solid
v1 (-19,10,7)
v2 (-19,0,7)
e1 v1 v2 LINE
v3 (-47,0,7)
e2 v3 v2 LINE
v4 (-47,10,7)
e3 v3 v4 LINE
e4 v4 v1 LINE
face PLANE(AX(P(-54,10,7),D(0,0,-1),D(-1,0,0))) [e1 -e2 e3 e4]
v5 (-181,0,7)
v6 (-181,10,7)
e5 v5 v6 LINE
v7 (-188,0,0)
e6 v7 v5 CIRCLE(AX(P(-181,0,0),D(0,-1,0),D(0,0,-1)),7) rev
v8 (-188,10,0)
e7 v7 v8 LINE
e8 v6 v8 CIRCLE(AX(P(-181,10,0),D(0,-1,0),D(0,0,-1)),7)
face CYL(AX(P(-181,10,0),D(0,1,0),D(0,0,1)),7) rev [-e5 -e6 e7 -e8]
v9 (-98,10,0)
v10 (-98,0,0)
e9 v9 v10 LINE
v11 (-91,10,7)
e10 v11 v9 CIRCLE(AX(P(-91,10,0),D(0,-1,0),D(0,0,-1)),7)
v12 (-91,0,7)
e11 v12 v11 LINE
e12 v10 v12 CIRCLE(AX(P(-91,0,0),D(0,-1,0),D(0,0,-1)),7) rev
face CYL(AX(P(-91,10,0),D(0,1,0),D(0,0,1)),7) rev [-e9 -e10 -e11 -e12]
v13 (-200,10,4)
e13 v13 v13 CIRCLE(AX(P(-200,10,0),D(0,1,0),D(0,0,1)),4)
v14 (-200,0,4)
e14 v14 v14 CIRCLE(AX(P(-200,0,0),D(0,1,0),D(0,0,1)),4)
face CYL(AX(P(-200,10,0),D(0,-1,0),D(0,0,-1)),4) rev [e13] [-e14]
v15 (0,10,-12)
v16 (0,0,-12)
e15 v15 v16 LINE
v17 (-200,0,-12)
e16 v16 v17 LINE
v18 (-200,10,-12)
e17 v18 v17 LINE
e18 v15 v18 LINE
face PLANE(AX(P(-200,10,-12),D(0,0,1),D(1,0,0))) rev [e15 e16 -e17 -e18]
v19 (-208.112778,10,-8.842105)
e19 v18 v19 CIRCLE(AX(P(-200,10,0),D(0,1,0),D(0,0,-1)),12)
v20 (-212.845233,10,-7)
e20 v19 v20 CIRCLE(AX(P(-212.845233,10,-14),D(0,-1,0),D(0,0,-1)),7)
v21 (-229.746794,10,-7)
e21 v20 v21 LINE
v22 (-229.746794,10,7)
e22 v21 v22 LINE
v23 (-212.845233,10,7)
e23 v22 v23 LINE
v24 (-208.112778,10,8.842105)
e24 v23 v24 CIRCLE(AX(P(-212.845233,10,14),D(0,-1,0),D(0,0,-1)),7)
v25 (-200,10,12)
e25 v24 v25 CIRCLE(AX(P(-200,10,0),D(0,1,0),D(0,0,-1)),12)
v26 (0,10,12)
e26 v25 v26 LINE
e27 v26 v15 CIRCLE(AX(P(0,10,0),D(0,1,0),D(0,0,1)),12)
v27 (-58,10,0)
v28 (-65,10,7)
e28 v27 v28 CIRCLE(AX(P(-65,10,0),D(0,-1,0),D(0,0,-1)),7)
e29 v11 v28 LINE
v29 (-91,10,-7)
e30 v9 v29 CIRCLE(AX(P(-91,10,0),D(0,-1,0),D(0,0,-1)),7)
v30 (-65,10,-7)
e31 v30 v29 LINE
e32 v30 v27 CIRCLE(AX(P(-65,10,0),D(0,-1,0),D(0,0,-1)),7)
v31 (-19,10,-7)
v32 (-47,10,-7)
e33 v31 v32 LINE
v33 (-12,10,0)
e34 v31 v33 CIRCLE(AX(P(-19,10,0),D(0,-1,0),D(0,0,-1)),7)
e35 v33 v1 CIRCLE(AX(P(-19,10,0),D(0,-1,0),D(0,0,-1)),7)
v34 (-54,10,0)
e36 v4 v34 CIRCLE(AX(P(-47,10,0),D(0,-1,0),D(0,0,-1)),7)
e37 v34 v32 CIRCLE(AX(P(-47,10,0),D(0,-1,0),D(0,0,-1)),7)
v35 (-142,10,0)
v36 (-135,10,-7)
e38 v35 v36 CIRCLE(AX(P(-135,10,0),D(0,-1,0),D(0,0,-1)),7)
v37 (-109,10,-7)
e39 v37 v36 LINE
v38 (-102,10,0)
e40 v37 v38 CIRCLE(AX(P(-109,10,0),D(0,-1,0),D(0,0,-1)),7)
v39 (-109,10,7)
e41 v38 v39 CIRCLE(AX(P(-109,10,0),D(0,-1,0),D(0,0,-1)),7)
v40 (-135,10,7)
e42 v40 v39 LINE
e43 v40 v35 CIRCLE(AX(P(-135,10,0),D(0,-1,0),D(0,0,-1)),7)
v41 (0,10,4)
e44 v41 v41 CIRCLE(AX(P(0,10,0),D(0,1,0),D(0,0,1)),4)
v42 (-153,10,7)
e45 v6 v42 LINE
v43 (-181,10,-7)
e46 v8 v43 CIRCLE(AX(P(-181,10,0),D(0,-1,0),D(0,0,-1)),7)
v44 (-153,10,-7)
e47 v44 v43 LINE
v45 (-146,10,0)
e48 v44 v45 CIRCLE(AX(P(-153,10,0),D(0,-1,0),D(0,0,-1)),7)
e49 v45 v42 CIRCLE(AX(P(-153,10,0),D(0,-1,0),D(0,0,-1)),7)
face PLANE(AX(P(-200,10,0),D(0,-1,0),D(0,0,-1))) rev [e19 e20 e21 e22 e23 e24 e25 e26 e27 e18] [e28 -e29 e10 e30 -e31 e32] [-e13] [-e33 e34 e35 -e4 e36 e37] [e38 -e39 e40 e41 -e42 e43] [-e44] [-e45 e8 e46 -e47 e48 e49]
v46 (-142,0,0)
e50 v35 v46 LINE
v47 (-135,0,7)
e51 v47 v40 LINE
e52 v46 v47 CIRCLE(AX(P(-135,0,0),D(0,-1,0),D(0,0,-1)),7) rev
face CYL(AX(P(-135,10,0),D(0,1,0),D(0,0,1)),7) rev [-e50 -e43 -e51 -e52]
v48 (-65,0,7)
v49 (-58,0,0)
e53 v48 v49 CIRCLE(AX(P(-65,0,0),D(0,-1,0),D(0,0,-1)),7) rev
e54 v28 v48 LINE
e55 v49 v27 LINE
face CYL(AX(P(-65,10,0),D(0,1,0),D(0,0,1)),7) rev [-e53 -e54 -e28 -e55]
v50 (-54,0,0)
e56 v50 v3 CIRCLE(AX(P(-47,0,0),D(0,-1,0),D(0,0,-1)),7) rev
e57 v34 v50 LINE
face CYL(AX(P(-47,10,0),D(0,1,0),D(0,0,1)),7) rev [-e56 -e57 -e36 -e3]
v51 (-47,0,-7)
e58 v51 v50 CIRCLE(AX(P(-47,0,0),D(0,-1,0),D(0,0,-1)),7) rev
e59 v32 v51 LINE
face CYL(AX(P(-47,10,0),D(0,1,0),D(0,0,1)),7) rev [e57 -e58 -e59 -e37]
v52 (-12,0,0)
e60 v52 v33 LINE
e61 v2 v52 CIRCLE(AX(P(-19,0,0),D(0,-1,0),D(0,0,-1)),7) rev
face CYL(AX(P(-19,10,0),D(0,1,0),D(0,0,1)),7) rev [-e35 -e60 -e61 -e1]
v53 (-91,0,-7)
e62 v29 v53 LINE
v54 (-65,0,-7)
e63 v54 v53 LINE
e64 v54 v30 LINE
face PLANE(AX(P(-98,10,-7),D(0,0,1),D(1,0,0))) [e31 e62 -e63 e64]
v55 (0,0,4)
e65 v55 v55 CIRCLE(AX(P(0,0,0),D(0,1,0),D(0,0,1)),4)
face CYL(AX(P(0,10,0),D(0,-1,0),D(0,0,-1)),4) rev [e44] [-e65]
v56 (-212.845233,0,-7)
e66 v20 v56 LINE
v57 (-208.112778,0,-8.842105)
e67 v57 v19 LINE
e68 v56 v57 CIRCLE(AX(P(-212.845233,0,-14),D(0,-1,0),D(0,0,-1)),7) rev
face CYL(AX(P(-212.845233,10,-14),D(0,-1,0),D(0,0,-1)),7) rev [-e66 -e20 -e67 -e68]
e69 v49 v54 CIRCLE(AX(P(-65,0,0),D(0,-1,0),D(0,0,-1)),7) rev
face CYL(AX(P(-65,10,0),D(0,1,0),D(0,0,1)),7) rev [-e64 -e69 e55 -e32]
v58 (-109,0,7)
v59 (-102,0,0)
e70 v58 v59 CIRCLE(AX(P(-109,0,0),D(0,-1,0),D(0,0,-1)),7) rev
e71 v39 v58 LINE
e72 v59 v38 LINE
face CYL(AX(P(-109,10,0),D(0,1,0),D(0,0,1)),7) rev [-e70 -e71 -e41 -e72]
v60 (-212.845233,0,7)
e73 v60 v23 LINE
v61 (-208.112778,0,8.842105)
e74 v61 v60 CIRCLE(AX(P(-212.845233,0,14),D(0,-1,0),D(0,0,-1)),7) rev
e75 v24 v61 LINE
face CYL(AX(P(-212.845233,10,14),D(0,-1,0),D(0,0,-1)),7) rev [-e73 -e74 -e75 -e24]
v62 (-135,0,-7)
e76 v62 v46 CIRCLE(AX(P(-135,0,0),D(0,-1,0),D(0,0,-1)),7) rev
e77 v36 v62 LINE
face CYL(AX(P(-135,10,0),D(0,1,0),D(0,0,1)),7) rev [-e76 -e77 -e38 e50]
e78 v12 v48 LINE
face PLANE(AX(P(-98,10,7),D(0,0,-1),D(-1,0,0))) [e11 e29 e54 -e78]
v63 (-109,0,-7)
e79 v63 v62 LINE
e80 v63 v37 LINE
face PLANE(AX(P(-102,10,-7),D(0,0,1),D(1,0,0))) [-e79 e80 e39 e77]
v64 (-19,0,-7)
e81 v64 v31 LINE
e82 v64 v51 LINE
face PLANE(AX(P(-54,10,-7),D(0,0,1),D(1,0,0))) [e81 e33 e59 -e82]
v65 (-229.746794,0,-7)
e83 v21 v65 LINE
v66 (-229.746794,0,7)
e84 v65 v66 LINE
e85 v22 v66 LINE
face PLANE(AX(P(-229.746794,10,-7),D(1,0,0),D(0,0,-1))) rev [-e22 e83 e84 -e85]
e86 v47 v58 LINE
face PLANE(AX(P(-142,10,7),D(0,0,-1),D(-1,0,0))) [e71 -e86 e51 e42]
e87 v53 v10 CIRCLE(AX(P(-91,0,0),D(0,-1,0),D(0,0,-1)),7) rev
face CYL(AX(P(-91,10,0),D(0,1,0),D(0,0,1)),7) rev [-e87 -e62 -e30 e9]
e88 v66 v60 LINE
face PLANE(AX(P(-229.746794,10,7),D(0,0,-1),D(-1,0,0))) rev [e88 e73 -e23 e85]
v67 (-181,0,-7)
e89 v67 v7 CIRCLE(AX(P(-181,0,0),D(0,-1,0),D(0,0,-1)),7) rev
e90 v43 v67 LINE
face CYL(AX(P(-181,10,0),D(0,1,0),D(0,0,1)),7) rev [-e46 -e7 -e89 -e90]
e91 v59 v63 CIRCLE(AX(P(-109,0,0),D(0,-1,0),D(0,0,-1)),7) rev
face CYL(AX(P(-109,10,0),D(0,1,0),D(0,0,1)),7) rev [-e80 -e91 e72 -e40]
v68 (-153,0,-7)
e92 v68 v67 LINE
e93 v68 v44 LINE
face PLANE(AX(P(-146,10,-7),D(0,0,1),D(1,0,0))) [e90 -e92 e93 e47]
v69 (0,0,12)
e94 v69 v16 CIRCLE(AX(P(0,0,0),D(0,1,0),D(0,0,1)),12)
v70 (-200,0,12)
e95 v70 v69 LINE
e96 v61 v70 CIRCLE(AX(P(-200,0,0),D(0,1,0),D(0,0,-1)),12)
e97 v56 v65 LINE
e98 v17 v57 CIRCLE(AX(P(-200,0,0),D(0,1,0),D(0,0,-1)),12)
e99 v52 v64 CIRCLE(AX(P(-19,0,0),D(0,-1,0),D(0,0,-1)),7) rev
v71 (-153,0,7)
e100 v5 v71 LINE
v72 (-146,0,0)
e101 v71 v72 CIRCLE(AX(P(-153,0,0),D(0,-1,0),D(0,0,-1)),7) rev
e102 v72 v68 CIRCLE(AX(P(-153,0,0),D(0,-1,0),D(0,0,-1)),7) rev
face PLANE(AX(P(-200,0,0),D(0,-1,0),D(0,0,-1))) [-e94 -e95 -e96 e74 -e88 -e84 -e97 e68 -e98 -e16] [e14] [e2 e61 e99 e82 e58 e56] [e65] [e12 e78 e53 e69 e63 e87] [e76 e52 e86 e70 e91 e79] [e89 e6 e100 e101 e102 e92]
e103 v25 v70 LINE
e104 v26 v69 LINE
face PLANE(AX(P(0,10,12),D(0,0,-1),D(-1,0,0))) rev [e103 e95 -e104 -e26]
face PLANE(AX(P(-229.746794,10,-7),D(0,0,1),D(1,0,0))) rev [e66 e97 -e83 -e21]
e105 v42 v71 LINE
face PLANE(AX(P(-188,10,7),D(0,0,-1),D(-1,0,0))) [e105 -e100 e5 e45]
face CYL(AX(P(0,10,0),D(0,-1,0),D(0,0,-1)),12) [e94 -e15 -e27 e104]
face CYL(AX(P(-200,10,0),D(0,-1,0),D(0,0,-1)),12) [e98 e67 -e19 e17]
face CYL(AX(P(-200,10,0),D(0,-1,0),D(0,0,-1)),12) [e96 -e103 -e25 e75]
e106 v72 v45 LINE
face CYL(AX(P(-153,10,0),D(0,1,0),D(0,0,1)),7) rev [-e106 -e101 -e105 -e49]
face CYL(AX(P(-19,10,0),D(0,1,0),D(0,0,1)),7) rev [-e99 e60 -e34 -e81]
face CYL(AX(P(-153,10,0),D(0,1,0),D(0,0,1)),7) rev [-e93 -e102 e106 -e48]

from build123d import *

# Parameters (mm, degrees)
SKETCH1_R           = 4
SKETCH1_W           = 42
SKETCH1_H           = 14
SKETCH1_W_2         = 40
BOSS_EXTRUDE1_DEPTH = 10
FILLET1_R           = 7


with BuildPart() as part:
    # Sketch1 → Boss-Extrude1 (new body)
    with BuildSketch(Plane(origin=(0, 0, 0), x_dir=(1, 0, 0), z_dir=(0, 1, 0))):
        with BuildLine():
            Line((-200, 12), (0, 12))
            ThreePointArc((0, 12), (12, 0), (0, -12))
            Line((0, -12), (-200, -12))
            ThreePointArc((-200, -12), (-205.477225575, -10.677078252), (-209.746794345, -7))
            Line((-209.746794345, -7), (-229.746794345, -7))
            Line((-229.746794345, -7), (-229.746794345, 7))
            Line((-229.746794345, 7), (-209.746794345, 7))
            ThreePointArc((-209.746794345, 7), (-205.477225575, 10.677078252), (-200, 12))
        make_face()
        with Locations(Location((-200, 0, 0), (0, 0, 270))):
            Circle(SKETCH1_R, mode=Mode.SUBTRACT)
        with Locations(Location((0, 0, 0), (0, 0, 270))):
            Circle(SKETCH1_R, mode=Mode.SUBTRACT)
        with Locations((-167, 0)):
            Rectangle(SKETCH1_W, SKETCH1_H, mode=Mode.SUBTRACT)
        with Locations((-122, 0)):
            Rectangle(SKETCH1_W_2, SKETCH1_H, mode=Mode.SUBTRACT)
        with Locations((-78, 0)):
            Rectangle(SKETCH1_W_2, SKETCH1_H, mode=Mode.SUBTRACT)
        with Locations((-33, 0)):
            Rectangle(SKETCH1_W, SKETCH1_H, mode=Mode.SUBTRACT)
    extrude(amount=BOSS_EXTRUDE1_DEPTH)

    # Fillet1
    fillet1_edges = [part.edges().sort_by_distance(p)[0] for p in [
        (-142, 5, -7),
        (-98, 5, -7),
        (-54, 5, -7),
        (-58, 5, -7),
        (-12, 5, -7),
        (-102, 5, -7),
        (-146, 5, -7),
        (-146, 5, 7),
        (-102, 5, 7),
        (-58, 5, 7),
        (-12, 5, 7),
        (-54, 5, 7),
        (-98, 5, 7),
        (-142, 5, 7),
        (-188, 5, 7),
        (-188, 5, -7),
        (-209.746794345, 5, 7),
        (-209.746794345, 5, -7),
    ]]
    fillet(fillet1_edges, radius=FILLET1_R - 0.0001)  # a hair under: the kernel refuses the full size


solid = part.part
